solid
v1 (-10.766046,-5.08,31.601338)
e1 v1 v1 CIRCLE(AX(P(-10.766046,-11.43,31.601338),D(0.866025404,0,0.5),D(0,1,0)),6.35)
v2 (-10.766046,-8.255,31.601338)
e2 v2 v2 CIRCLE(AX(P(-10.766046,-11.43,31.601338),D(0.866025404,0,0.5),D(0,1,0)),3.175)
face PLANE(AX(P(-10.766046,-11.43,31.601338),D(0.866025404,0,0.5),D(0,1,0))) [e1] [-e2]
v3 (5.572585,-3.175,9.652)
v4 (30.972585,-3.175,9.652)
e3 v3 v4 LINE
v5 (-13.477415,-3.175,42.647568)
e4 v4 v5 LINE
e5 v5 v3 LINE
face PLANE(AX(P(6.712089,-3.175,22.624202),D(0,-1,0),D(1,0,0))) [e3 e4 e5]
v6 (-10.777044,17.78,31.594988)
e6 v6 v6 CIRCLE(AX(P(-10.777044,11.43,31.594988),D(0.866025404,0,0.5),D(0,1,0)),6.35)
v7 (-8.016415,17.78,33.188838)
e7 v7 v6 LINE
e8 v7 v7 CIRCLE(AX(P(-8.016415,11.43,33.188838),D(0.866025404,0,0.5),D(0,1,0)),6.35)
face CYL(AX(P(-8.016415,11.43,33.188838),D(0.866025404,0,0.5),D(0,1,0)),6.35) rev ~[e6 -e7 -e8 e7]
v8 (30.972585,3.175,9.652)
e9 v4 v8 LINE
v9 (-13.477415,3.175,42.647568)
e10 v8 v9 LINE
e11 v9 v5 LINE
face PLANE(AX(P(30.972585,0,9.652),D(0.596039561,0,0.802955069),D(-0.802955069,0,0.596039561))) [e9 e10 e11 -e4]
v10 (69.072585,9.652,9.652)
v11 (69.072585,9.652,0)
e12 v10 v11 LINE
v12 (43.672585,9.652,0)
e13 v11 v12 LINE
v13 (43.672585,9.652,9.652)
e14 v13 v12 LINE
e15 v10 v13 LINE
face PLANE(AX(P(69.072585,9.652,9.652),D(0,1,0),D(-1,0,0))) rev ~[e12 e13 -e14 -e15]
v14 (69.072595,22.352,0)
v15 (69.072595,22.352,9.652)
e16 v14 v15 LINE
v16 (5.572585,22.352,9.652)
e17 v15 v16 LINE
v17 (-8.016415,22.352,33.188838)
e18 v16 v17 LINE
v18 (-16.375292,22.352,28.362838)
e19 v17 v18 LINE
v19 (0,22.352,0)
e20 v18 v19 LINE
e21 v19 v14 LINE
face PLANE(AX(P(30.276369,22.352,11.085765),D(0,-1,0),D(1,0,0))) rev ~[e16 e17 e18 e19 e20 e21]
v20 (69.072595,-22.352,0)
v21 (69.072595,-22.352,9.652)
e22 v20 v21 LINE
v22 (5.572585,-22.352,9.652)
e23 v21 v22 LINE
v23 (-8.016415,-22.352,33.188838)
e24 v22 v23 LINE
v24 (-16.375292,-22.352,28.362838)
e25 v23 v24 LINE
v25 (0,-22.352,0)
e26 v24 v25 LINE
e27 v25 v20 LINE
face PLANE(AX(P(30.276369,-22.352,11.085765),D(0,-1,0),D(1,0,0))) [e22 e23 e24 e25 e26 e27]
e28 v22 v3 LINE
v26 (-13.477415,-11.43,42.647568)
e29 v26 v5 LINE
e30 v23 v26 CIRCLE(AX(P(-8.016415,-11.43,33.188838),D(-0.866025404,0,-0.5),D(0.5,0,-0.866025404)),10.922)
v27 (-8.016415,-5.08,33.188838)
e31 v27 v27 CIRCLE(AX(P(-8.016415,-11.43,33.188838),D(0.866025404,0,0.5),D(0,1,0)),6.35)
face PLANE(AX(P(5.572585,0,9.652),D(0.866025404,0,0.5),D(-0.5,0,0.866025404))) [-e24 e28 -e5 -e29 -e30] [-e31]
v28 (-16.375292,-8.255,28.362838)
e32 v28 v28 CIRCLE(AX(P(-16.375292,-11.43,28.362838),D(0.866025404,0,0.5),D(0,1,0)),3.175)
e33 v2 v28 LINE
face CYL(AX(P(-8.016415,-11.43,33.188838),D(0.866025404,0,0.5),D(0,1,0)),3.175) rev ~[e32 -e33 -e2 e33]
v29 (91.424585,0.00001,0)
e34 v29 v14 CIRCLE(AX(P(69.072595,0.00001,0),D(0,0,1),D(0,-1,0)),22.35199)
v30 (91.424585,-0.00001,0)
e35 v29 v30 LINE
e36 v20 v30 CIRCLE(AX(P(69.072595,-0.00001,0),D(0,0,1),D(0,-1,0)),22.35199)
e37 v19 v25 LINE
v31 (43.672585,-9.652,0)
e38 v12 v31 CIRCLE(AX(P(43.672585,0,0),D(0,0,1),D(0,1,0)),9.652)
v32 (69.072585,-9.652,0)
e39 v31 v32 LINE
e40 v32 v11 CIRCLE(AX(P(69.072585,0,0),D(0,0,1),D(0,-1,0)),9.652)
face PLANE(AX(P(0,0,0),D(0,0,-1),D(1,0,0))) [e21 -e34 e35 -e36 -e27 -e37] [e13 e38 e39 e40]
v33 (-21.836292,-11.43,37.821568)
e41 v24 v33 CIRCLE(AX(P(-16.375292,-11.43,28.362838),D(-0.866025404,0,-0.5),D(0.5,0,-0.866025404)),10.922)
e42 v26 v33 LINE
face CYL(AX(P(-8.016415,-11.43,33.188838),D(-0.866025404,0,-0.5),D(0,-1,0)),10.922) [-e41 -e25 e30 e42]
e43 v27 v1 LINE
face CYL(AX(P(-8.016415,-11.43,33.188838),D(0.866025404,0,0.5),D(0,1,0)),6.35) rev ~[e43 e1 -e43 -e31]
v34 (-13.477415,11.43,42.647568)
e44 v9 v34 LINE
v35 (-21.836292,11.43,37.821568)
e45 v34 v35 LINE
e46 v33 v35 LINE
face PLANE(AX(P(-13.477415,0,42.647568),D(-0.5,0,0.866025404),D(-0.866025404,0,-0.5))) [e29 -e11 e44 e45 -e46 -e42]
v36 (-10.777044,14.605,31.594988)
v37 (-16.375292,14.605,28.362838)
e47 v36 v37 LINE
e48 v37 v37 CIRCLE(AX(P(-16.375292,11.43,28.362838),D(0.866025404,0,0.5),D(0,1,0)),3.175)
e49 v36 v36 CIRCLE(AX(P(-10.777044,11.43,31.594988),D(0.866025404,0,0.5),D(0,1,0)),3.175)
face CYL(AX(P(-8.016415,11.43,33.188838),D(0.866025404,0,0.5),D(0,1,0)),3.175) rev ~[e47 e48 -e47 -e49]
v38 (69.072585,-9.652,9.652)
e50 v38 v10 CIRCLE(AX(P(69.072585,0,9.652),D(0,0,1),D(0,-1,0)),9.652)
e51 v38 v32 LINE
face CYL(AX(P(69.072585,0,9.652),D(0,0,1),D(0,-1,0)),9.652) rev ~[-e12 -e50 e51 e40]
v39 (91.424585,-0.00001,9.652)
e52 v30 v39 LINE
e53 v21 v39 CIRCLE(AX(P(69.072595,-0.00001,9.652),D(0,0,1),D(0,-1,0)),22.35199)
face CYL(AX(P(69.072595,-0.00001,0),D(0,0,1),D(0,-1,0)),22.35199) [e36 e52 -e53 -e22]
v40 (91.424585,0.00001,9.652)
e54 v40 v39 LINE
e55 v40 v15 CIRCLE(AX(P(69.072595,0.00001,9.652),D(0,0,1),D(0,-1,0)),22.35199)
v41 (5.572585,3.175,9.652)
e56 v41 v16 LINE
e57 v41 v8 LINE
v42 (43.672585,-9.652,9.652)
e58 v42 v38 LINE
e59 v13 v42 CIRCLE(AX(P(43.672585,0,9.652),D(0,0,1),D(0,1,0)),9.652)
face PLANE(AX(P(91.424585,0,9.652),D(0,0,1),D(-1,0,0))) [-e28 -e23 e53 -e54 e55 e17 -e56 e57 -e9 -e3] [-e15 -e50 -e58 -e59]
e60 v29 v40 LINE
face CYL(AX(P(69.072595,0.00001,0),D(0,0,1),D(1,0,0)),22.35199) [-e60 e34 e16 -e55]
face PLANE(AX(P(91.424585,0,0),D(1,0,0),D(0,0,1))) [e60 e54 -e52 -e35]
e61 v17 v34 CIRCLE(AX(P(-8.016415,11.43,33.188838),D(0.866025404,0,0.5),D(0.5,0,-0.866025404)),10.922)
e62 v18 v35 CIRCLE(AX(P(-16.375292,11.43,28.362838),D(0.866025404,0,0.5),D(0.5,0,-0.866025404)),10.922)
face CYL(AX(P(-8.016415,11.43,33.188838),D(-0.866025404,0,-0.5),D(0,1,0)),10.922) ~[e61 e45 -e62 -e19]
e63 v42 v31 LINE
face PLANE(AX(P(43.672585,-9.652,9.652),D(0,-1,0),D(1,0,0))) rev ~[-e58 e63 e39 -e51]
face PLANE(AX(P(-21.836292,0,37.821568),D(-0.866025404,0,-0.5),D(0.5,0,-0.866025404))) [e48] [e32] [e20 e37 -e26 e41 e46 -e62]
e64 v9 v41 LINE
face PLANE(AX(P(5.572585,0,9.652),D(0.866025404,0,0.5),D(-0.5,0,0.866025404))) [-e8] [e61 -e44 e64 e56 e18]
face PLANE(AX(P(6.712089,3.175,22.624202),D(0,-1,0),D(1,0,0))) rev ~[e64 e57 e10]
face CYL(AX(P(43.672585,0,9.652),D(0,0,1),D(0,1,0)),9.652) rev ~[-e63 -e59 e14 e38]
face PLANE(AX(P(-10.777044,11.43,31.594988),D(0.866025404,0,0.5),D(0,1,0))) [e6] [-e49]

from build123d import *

# Parameters (mm, degrees)
F1_DEPTH      = 22.352
F1_DEPTH_BACK = 22.352
F3_DEPTH      = 3.175
F3_DEPTH_BACK = 3.175
F4_R          = 10.922
F5_R          = 22.35199
F7_DEPTH      = 9.652
F9_R          = 6.35
F9_R_2        = 3.175
F10_DEPTH     = 3.175
F11_DEPTH     = 28.5637839421
F12_R         = 6.35
F12_R_2       = 3.175
F13_DEPTH     = 3.1877
F14_DEPTH     = 28.5637839421


# Not quite as in the source:
# - a fillet or chamfer is up to 0.001 mm smaller than in the source, because OpenCascade refuses the exact size


with BuildPart() as f1:
    # F0 (on Front) → F1 (new body, two sides)
    with BuildSketch(Plane.XZ) as f1_sk:
        Polygon((-21.8362923991, 37.8215678842), (0, 0), (91.4245847982, 0), (91.4245847982, 9.652), (5.5725847982, 9.652), (-13.4774152018, 42.6475678842), align=None)
    extrude(amount=F1_DEPTH)
    extrude(f1_sk.sketch, amount=-F1_DEPTH_BACK)

    # F2 (on Front) → F3 (join, two sides)
    with BuildSketch(Plane.XZ) as f3_sk:
        Polygon((30.9725847982, 9.652), (-13.4774152018, 42.6475678842), (5.5725847982, 9.652), align=None)
    extrude(amount=F3_DEPTH)
    extrude(f3_sk.sketch, amount=-F3_DEPTH_BACK)

    # F4
    f4_edges = [f1.edges().sort_by_distance(p)[0] for p in [
        (-17.656854, -22.352, 40.234568),
        (-17.656854, 22.352, 40.234568),
    ]]
    fillet(f4_edges, radius=F4_R)

    # F5 (radius 22.352 in the source; OpenCascade refuses exactly that, so slightly less here)
    f5_edges = [f1.edges().sort_by_distance(p)[0] for p in [
        (91.424585, -22.352, 4.826),
        (91.424585, 22.352, 4.826),
    ]]
    fillet(f5_edges, radius=F5_R)

    # F6 (on face) → F7 (cut, through all)
    with BuildSketch(Plane.XY.offset(9.652)):
        with BuildLine():
            Line((43.6725847982, -9.652), (69.0725847982, -9.652))
            ThreePointArc((69.0725847982, -9.652), (78.7245847982, 0), (69.0725847982, 9.652))
            Line((69.0725847982, 9.652), (43.6725847982, 9.652))
            ThreePointArc((43.6725847982, 9.652), (34.0205847982, 0), (43.6725847982, -9.652))
        make_face()
    extrude(amount=-F7_DEPTH, mode=Mode.SUBTRACT)

    # F9 (on face) → F10 (cut)
    with BuildSketch(Plane(origin=(8.3588771973, 0, 4.826), x_dir=(0, 1, 0), z_dir=(0.8660254038, 0, 0.5))):
        with Locations((-11.43, 32.7505847982)):
            Circle(F9_R)
        with Locations((-11.43, 32.7505847982)):
            Circle(F9_R_2, mode=Mode.SUBTRACT)
        with Locations((-11.43, 32.7505847982)):
            Circle(F9_R_2)
    extrude(amount=-F10_DEPTH, mode=Mode.SUBTRACT)

    # F9 (on face) → F11 (cut, through all)
    with BuildSketch(Plane(origin=(8.3588771973, 0, 4.826), x_dir=(0, 1, 0), z_dir=(0.8660254038, 0, 0.5))):
        with Locations((-11.43, 32.7505847982)):
            Circle(F9_R_2)
    extrude(amount=-F11_DEPTH, mode=Mode.SUBTRACT)

    # F12 (on face) → F13 (cut)
    with BuildSketch(Plane(origin=(8.3588771973, 0, 4.826), x_dir=(0, 1, 0), z_dir=(0.8660254038, 0, 0.5))):
        with Locations((11.43, 32.7505847982)):
            Circle(F12_R)
        with Locations((11.43, 32.7505847982)):
            Circle(F12_R_2, mode=Mode.SUBTRACT)
        with Locations((11.43, 32.7505847982)):
            Circle(F12_R_2)
    extrude(amount=-F13_DEPTH, mode=Mode.SUBTRACT)

    # F12 (on face) → F14 (cut, through all)
    with BuildSketch(Plane(origin=(8.3588771973, 0, 4.826), x_dir=(0, 1, 0), z_dir=(0.8660254038, 0, 0.5))):
        with Locations((11.43, 32.7505847982)):
            Circle(F12_R_2)
    extrude(amount=-F14_DEPTH, mode=Mode.SUBTRACT)


solid = f1.part
